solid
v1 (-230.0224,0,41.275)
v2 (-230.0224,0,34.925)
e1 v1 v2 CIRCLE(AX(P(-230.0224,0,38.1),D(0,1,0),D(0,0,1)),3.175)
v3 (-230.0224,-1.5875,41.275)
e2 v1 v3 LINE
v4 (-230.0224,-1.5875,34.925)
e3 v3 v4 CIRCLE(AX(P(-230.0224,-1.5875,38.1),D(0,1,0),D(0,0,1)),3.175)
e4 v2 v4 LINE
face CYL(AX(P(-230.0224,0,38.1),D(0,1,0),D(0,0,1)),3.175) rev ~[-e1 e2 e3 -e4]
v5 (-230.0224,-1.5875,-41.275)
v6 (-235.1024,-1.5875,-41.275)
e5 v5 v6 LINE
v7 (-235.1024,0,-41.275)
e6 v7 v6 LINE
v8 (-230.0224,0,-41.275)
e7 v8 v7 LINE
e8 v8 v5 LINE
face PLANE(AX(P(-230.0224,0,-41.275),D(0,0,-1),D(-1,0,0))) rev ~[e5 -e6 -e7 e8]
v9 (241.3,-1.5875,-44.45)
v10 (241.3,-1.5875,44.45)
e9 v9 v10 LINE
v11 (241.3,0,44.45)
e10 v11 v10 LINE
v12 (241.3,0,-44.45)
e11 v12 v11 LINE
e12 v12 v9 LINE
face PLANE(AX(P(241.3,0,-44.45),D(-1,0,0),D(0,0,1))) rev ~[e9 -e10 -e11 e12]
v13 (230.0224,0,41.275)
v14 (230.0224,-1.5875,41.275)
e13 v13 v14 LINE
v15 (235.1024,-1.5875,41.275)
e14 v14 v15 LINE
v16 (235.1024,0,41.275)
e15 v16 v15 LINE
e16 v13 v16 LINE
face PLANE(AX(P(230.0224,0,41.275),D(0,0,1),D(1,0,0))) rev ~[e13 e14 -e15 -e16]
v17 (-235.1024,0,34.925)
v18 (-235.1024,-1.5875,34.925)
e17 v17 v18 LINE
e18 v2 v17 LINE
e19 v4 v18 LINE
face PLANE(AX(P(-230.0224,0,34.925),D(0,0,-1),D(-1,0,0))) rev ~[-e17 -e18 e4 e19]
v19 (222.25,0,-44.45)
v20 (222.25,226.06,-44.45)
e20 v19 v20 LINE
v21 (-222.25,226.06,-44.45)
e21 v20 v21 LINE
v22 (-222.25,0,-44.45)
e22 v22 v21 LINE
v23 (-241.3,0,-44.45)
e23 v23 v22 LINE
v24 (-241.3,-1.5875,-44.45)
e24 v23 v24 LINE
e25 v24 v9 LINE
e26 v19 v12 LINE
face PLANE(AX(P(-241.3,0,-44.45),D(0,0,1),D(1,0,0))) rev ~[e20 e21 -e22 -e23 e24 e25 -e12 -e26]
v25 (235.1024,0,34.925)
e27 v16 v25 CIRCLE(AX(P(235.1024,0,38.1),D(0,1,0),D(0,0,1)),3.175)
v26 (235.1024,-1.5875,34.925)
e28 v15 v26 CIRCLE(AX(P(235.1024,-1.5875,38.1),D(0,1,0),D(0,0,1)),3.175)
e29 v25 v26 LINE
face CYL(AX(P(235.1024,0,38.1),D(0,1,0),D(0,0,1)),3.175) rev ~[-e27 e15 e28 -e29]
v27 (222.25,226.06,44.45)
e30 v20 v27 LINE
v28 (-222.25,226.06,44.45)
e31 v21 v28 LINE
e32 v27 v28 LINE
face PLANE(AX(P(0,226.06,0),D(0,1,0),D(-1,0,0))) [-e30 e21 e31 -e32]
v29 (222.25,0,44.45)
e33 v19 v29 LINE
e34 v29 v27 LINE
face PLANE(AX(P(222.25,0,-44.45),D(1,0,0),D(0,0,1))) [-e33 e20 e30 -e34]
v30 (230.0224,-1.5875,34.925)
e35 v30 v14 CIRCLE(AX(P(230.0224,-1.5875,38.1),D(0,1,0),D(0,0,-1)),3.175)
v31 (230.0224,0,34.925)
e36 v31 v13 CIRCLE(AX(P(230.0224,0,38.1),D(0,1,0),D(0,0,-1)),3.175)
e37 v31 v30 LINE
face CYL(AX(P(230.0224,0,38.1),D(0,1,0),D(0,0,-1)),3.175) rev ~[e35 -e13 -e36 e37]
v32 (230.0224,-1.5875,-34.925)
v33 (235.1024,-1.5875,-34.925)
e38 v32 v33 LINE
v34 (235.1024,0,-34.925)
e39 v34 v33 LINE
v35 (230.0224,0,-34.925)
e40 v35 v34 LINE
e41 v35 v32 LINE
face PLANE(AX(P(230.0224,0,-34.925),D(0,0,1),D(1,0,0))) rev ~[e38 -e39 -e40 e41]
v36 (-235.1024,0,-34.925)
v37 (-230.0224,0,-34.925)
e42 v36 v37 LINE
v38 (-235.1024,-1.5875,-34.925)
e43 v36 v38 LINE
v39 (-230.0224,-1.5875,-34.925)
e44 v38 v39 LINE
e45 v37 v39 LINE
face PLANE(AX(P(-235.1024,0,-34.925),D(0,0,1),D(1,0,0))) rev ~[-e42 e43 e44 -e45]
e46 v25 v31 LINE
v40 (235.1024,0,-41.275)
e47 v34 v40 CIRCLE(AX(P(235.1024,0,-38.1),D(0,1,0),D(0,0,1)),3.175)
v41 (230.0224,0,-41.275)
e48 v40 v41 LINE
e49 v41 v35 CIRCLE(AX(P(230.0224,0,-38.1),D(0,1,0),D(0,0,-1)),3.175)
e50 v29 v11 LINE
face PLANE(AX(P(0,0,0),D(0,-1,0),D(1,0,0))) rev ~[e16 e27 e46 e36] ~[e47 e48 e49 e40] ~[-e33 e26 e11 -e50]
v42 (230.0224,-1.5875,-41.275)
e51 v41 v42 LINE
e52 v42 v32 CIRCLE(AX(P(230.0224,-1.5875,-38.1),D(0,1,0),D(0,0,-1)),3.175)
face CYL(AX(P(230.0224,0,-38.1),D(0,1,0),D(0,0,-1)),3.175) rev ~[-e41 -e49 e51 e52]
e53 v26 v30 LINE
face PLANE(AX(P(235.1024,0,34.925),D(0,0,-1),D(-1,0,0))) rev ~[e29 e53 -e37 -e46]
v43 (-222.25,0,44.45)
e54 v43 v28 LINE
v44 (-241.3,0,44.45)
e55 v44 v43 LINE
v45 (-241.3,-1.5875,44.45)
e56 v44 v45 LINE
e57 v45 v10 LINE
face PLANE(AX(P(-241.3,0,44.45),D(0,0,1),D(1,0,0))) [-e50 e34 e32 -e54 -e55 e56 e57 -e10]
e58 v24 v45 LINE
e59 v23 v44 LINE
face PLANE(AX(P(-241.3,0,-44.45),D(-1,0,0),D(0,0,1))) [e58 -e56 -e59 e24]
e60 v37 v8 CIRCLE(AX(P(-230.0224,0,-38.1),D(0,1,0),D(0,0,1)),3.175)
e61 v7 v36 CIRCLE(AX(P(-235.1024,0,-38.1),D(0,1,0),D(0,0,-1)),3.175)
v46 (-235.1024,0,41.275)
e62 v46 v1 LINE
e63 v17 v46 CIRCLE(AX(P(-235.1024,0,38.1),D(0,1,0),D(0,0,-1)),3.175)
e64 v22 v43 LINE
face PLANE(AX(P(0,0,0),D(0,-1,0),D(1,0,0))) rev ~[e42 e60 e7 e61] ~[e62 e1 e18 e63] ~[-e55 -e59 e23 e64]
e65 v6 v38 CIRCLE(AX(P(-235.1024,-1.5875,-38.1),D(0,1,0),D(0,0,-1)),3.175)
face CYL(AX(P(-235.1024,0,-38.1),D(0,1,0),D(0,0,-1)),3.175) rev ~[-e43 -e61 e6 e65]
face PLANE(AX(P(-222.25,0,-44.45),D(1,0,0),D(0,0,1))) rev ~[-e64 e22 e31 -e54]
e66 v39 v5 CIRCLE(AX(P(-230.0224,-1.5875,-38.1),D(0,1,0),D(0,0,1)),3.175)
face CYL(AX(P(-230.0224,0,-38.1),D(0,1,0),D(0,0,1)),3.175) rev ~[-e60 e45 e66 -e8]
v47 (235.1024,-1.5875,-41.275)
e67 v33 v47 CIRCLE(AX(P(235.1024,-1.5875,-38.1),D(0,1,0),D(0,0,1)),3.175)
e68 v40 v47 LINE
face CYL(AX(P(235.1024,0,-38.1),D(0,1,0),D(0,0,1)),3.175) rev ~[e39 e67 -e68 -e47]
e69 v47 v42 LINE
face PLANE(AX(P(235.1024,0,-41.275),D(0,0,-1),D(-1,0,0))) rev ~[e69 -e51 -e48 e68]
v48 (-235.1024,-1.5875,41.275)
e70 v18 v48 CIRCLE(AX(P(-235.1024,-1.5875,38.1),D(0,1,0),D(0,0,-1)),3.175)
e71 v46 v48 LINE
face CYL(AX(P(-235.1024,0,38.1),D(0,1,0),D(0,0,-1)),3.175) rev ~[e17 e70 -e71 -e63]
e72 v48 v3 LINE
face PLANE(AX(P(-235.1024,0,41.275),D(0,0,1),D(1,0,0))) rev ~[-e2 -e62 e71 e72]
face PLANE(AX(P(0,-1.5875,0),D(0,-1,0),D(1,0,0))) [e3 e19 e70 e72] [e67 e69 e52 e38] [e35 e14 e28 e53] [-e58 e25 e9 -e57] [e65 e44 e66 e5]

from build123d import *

# Parameters (mm, degrees)
F1_W     = 482.6
F1_H     = 88.9
F2_DEPTH = 1.5875
F3_W     = 444.5
F3_H     = 88.9
F4_DEPTH = 226.06


# Not quite as in the source:
# - a variable given as a bare number and used for a length is read in inches; the dataset says mm whatever the document's units were


with BuildPart() as f2:
    # F1 (on Front) → F2 (new body)
    with BuildSketch(Plane.XZ):
        Rectangle(F1_W, F1_H)
        with BuildLine():
            Line((-235.1024, -34.925), (-230.0224, -34.925))
            ThreePointArc((-230.0224, -34.925), (-226.8474, -38.1), (-230.0224, -41.275))
            Line((-230.0224, -41.275), (-235.1024, -41.275))
            ThreePointArc((-235.1024, -41.275), (-238.2774, -38.1), (-235.1024, -34.925))
        make_face(mode=Mode.SUBTRACT)
        with BuildLine():
            Line((230.0224, -34.925), (235.1024, -34.925))
            ThreePointArc((235.1024, -34.925), (238.2774, -38.1), (235.1024, -41.275))
            Line((235.1024, -41.275), (230.0224, -41.275))
            ThreePointArc((230.0224, -41.275), (226.8474, -38.1), (230.0224, -34.925))
        make_face(mode=Mode.SUBTRACT)
        with BuildLine():
            ThreePointArc((-235.1024, 34.925), (-238.2774, 38.1), (-235.1024, 41.275))
            Line((-235.1024, 41.275), (-230.0224, 41.275))
            ThreePointArc((-230.0224, 41.275), (-226.8474, 38.1), (-230.0224, 34.925))
            Line((-230.0224, 34.925), (-235.1024, 34.925))
        make_face(mode=Mode.SUBTRACT)
        with BuildLine():
            Line((235.1024, 34.925), (230.0224, 34.925))
            ThreePointArc((230.0224, 34.925), (226.8474, 38.1), (230.0224, 41.275))
            Line((230.0224, 41.275), (235.1024, 41.275))
            ThreePointArc((235.1024, 41.275), (238.2774, 38.1), (235.1024, 34.925))
        make_face(mode=Mode.SUBTRACT)
    extrude(amount=F2_DEPTH)

    # F3 (on face) → F4 (join)
    with BuildSketch(Plane(origin=(0, 0, 0), x_dir=(-1, 0, 0), z_dir=(0, 1, 0))):
        Rectangle(F3_W, F3_H)
    extrude(amount=F4_DEPTH)


solid = f2.part
